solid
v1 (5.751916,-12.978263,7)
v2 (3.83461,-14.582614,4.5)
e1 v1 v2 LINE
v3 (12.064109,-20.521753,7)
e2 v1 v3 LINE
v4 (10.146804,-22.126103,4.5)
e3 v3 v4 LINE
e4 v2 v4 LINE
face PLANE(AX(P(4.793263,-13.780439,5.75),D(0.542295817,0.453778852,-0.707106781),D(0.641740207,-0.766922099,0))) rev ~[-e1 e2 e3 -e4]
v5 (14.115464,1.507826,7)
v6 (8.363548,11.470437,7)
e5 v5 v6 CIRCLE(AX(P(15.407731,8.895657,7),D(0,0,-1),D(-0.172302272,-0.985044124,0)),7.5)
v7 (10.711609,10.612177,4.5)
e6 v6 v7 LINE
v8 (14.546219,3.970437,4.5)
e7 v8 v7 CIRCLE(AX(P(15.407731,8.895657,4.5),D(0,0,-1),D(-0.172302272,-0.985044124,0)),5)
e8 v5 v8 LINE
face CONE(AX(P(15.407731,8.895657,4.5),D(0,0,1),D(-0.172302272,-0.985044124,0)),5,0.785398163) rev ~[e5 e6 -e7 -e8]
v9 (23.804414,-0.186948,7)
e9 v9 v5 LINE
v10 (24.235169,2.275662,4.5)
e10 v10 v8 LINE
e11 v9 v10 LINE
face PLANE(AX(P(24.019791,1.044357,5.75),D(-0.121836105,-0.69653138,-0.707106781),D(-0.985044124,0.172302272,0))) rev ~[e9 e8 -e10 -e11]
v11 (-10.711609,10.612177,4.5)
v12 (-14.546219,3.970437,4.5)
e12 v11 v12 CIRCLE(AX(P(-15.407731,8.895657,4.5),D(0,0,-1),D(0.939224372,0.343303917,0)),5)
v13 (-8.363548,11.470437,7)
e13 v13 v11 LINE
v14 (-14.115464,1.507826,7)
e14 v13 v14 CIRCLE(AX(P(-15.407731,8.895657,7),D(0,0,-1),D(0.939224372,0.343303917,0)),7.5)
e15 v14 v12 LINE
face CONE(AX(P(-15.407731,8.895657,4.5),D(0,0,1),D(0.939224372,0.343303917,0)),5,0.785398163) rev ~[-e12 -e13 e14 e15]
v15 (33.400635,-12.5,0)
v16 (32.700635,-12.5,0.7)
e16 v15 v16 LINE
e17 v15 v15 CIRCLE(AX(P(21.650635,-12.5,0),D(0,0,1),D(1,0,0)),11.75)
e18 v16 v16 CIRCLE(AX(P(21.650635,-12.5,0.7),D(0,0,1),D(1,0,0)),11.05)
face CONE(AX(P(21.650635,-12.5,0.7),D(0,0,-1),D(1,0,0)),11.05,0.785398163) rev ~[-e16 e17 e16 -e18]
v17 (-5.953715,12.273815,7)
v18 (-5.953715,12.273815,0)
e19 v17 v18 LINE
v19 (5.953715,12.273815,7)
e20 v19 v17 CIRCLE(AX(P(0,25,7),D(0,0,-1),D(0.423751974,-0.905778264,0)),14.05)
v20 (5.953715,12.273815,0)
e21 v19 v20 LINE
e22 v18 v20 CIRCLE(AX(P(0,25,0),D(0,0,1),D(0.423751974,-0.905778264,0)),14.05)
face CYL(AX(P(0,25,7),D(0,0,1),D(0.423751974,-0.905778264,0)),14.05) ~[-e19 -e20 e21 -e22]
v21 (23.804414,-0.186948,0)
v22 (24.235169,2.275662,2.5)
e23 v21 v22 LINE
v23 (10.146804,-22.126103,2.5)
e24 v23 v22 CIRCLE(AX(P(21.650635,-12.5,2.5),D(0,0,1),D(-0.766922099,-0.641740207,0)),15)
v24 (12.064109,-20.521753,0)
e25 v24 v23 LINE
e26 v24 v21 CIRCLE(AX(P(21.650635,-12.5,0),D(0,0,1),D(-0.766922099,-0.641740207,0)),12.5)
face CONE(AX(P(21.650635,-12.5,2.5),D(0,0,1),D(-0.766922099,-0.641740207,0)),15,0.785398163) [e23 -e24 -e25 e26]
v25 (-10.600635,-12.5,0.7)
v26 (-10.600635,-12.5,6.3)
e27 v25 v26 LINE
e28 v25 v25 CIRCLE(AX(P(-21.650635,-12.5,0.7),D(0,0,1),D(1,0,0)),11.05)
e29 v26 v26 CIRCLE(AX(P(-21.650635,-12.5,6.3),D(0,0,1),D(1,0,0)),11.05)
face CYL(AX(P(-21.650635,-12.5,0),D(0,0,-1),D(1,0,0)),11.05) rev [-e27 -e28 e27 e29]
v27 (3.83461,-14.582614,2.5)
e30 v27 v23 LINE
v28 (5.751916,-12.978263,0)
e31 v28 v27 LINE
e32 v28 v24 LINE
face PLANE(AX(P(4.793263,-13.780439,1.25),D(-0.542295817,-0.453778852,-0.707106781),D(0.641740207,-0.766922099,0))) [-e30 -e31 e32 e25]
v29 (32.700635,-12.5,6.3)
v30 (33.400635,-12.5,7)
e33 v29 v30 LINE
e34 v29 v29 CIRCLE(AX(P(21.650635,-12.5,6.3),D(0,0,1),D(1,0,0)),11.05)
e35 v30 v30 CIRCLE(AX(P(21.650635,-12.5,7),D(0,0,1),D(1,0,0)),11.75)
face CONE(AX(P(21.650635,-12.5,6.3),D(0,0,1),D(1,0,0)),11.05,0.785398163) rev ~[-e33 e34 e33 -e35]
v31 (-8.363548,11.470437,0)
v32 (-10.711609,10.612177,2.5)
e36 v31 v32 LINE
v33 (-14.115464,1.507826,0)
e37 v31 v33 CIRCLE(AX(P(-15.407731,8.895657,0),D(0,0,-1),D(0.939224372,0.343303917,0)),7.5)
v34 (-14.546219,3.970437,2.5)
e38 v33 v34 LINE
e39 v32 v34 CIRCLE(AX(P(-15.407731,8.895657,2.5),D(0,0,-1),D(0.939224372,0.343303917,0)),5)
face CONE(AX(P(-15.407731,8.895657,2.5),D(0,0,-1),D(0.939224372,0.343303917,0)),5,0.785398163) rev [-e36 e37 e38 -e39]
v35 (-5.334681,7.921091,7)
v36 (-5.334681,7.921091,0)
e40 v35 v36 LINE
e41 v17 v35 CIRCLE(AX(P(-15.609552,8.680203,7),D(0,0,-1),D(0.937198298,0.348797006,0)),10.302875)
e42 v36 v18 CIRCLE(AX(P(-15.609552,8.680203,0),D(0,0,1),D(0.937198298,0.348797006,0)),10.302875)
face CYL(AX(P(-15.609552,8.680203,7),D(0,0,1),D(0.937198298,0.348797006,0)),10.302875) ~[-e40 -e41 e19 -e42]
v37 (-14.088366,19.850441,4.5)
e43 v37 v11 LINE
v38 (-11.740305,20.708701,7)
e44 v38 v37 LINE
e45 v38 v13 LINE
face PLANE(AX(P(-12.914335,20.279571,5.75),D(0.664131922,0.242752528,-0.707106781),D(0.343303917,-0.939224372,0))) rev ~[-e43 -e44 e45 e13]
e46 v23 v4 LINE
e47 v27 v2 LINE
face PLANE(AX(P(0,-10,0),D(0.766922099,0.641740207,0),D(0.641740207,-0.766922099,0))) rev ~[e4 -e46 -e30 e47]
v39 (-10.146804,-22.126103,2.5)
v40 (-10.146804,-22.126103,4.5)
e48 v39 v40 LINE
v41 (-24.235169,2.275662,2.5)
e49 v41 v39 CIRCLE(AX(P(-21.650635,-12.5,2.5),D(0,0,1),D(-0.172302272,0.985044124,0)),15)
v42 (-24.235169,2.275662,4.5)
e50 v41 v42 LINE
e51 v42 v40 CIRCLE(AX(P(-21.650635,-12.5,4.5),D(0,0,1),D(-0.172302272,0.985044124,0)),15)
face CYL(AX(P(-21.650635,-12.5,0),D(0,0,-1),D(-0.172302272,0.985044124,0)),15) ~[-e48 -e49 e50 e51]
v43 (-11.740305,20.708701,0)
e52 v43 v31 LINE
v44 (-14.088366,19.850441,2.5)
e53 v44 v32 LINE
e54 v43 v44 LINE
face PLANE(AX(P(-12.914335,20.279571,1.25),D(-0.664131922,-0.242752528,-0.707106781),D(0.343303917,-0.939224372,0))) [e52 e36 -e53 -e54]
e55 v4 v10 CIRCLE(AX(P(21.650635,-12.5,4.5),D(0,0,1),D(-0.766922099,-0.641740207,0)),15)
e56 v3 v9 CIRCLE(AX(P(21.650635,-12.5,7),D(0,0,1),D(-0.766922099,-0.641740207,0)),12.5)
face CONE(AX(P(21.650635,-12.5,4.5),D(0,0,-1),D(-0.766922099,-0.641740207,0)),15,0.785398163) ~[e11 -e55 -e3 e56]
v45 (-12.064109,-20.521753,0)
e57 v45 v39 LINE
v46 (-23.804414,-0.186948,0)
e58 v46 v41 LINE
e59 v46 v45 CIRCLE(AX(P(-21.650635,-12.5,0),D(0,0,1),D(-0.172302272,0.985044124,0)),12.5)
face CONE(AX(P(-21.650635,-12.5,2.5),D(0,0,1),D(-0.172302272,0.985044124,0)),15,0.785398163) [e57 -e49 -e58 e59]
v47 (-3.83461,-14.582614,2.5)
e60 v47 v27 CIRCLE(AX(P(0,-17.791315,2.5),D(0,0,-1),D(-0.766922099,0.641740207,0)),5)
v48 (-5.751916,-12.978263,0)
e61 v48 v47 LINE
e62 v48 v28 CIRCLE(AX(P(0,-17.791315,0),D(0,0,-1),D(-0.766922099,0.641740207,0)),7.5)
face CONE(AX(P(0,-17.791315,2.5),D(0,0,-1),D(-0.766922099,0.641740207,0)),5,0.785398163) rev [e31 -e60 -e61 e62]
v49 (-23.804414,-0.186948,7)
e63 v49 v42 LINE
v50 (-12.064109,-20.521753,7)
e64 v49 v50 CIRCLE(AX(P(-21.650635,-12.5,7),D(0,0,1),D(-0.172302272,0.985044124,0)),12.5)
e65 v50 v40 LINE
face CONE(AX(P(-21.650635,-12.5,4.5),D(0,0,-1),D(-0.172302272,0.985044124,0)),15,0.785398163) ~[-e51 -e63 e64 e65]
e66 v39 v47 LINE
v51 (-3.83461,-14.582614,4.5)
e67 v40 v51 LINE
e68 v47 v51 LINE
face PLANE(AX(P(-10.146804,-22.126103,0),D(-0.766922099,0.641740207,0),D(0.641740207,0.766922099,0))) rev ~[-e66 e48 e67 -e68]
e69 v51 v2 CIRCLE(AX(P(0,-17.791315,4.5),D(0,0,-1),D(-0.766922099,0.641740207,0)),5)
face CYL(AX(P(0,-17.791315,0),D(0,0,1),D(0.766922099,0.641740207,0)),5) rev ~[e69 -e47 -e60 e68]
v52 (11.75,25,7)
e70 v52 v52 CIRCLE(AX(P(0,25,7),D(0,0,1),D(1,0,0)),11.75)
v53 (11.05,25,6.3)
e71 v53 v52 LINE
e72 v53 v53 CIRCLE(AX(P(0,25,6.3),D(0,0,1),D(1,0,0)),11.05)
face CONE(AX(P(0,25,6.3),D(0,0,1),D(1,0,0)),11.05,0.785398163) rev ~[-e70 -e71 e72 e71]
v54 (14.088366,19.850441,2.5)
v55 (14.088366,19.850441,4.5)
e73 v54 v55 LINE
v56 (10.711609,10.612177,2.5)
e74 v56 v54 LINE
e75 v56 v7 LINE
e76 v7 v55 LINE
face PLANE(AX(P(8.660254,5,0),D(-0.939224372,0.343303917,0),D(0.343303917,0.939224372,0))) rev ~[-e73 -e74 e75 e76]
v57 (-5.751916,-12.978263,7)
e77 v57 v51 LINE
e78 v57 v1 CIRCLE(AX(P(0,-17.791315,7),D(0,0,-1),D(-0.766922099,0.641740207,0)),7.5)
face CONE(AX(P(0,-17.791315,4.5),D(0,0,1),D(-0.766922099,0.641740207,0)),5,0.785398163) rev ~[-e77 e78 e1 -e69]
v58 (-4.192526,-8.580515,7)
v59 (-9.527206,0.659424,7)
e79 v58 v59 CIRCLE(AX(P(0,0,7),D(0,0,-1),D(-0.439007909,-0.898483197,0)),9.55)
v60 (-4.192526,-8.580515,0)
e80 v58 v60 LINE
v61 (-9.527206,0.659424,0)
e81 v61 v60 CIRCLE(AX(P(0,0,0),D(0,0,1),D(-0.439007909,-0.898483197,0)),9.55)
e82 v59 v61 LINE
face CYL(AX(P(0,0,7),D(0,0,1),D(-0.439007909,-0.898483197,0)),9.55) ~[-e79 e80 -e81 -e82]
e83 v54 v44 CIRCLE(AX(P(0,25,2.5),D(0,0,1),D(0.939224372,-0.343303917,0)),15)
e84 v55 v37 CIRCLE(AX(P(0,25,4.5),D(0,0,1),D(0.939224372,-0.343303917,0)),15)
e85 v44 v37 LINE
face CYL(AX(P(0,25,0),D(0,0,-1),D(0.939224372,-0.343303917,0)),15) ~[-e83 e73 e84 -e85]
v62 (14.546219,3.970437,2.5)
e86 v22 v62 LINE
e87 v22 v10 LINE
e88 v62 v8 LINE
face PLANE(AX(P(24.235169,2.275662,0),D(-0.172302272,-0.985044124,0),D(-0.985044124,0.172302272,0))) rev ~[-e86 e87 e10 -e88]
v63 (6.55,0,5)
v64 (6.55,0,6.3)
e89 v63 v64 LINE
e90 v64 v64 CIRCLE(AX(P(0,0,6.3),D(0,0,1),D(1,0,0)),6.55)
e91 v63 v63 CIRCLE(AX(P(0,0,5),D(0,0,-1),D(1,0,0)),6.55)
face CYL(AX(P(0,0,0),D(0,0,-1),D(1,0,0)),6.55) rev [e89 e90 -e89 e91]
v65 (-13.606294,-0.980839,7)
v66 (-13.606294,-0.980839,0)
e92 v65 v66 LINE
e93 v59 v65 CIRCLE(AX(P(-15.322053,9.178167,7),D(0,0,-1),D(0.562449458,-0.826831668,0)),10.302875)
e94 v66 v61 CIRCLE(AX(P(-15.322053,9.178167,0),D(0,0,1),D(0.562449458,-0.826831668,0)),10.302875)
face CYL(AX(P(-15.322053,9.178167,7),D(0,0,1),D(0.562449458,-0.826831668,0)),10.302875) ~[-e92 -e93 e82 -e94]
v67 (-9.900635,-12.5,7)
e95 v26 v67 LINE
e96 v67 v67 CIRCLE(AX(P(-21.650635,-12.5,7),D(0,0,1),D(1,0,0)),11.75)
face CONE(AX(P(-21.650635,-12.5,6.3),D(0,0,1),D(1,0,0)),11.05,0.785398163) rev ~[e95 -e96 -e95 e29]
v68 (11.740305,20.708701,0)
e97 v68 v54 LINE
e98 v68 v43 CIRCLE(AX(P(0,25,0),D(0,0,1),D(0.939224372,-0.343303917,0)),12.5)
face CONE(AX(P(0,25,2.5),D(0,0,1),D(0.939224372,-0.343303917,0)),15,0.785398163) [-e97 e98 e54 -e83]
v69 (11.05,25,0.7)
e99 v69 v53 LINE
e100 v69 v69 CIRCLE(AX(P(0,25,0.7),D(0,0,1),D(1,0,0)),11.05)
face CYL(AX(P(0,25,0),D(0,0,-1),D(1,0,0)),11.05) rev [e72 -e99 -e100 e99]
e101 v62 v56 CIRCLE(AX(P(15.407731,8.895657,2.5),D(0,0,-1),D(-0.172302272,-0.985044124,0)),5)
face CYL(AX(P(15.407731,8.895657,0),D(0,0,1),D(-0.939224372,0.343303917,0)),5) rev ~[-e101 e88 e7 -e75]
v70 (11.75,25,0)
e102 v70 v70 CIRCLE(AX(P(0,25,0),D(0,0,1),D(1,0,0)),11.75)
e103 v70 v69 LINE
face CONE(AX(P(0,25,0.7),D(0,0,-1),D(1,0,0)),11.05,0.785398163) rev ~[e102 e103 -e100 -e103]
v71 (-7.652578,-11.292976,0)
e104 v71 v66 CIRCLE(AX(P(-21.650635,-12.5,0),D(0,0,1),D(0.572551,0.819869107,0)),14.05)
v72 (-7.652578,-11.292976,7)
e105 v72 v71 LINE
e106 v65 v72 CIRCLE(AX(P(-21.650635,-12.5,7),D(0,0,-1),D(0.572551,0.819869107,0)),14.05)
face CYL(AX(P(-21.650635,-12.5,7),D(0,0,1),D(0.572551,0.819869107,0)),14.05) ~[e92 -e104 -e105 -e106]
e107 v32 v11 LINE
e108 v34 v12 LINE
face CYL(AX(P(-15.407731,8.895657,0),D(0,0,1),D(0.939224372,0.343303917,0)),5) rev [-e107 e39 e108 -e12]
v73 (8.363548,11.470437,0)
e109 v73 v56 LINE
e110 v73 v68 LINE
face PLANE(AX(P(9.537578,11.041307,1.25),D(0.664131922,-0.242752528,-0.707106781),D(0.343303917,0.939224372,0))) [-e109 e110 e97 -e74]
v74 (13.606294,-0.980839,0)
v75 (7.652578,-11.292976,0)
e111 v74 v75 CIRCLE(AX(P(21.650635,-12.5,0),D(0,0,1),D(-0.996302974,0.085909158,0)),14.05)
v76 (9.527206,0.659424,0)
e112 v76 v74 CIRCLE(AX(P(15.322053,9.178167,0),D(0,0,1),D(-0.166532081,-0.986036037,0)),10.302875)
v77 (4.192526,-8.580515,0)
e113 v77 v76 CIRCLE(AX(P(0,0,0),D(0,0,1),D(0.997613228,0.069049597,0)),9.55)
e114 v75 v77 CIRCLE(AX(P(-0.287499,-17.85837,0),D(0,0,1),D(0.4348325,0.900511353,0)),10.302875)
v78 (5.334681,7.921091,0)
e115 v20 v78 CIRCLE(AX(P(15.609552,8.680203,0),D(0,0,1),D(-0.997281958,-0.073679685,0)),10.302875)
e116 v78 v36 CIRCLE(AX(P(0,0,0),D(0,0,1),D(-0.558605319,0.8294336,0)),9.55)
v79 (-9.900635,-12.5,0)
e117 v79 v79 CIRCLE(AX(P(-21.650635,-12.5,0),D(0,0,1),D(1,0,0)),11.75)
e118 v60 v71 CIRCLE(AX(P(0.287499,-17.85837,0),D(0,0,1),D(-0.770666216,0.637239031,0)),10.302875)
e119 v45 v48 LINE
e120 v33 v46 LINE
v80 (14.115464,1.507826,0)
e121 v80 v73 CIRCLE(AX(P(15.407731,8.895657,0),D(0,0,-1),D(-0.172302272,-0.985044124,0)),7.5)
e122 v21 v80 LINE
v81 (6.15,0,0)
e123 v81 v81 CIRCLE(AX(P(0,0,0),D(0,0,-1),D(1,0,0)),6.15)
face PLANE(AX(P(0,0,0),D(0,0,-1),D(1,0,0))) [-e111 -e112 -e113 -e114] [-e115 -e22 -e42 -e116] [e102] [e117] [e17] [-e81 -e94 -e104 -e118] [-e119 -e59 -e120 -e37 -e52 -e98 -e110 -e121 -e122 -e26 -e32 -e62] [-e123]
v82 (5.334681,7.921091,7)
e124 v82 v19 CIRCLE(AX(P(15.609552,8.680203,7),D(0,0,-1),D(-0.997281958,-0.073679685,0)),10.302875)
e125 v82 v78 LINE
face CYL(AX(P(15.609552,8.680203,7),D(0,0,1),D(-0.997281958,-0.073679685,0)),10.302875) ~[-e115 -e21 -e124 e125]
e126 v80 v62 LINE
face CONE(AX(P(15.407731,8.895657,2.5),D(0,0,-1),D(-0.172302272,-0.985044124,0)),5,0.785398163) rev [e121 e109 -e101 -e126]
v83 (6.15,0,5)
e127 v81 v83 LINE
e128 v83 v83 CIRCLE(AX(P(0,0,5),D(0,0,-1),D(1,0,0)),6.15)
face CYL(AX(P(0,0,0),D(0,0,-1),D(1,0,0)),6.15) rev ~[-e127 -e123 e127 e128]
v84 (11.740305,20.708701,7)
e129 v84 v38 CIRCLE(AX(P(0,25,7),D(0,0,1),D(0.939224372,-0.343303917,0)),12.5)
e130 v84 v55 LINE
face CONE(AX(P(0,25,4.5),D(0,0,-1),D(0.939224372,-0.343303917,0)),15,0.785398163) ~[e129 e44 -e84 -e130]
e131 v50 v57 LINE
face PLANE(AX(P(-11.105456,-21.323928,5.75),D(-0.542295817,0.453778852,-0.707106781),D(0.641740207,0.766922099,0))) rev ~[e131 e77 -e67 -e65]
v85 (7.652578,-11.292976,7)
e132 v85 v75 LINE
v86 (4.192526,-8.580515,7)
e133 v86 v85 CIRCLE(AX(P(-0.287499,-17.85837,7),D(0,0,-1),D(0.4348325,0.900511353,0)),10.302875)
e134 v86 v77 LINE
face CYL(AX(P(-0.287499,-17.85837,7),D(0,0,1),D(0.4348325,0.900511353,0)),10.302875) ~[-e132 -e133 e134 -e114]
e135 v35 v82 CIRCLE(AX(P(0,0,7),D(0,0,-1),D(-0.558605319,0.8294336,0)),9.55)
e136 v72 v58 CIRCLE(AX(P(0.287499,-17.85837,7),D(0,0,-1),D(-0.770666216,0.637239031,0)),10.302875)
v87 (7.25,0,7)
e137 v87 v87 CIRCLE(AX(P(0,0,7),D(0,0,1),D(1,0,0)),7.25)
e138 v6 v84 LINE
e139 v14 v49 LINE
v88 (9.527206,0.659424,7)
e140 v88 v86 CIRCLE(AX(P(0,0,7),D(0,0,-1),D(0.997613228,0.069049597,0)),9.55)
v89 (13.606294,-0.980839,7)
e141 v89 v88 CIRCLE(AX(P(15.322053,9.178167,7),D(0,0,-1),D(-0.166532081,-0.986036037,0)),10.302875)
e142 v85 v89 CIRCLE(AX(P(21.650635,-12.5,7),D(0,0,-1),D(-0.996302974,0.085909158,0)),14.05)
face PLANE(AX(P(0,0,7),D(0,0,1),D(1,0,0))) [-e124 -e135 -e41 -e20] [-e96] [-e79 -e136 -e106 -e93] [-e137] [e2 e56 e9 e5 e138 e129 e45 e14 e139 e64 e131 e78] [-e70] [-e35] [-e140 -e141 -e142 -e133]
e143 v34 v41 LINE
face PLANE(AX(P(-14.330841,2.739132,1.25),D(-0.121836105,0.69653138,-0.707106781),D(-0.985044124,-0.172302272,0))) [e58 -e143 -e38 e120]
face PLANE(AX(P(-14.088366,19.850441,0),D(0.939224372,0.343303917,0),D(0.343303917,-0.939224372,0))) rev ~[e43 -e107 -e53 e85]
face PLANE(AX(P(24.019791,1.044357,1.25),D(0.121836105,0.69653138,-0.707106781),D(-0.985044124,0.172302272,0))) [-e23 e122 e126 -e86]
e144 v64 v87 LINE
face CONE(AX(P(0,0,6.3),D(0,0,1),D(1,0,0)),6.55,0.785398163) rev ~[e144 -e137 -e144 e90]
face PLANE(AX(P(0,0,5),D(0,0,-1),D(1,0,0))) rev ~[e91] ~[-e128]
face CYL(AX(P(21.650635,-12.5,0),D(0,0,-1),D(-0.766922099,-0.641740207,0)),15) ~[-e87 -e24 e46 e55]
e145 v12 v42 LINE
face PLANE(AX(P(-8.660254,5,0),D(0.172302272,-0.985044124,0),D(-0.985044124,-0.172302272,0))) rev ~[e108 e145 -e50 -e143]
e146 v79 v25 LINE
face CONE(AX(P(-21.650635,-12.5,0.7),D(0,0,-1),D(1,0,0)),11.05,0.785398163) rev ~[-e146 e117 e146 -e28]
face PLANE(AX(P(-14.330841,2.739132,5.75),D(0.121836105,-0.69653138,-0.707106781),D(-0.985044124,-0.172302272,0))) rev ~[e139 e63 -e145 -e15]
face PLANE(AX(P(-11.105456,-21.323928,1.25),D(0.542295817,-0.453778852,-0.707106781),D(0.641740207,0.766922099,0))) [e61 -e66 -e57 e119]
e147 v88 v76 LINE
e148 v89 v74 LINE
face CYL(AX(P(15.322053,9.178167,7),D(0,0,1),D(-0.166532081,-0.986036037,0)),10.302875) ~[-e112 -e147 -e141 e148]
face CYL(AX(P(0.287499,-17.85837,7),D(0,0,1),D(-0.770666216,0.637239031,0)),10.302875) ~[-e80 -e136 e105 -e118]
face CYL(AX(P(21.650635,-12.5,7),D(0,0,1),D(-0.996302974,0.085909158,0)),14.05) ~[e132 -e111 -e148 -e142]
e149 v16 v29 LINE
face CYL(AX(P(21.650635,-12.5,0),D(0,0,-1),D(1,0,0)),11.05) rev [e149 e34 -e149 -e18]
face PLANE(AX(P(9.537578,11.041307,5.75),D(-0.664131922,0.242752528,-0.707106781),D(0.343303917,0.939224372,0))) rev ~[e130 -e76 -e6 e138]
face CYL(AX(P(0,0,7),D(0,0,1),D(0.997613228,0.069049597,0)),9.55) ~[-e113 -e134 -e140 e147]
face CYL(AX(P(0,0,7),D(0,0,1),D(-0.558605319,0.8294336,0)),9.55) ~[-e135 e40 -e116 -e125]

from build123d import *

# Parameters (mm, degrees)
F0_R     = 11.05
F0_R_2   = 6.55
F1_DEPTH = 7
F2_R     = 5
F3_SIZE  = 2.5
F4_R     = 6.55
F4_R_2   = 6.15
F5_DEPTH = 5
F6_SIZE  = 0.7
F8_DEPTH = 25


with BuildPart() as f1:
    # F0 (on Top) → F1 (new body)
    with BuildSketch(Plane.XY):
        with BuildLine():
            Line((8.6602540378, 5), (14.0883655764, 19.8504412435))
            ThreePointArc((14.0883655764, 19.8504412435), (0, 40), (-14.0883655764, 19.8504412435))
            Line((-14.0883655764, 19.8504412435), (-8.6602540378, 5))
            Line((-8.6602540378, 5), (-24.2351691813, 2.2756618652))
            ThreePointArc((-24.2351691813, 2.2756618652), (-34.6410161514, -20), (-10.146803605, -22.1261031087))
            Line((-10.146803605, -22.1261031087), (0, -10))
            Line((0, -10), (10.146803605, -22.1261031087))
            ThreePointArc((10.146803605, -22.1261031087), (34.6410161514, -20), (24.2351691813, 2.2756618652))
            Line((24.2351691813, 2.2756618652), (8.6602540378, 5))
        make_face()
        with Locations((-21.6506350946, -12.5)):
            Circle(F0_R, mode=Mode.SUBTRACT)
        with Locations((21.6506350946, -12.5)):
            Circle(F0_R, mode=Mode.SUBTRACT)
        Circle(F0_R_2, mode=Mode.SUBTRACT)
        with Locations((0, 25)):
            Circle(F0_R, mode=Mode.SUBTRACT)
    extrude(amount=F1_DEPTH)

    # F2
    f2_edges = [f1.edges().sort_by_distance(p)[0] for p in [
        (0, -10, 3.5),
        (8.660254, 5, 3.5),
        (-8.660254, 5, 3.5),
    ]]
    fillet(f2_edges, radius=F2_R)

    # F3
    f3_edges = [f1.edges().sort_by_distance(p)[0] for p in [
        (-19.390694, 3.123049, 7),
        (-6.990707, -18.354358, 0),
        (12.399987, 15.231309, 0),
        (12.399987, 15.231309, 7),
        (11.077604, 6.395657, 0),
        (0, 40, 0),
        (19.390694, 3.123049, 0),
        (-12.399987, 15.231309, 0),
        (34.641016, -20, 0),
        (-11.077604, 6.395657, 0),
        (6.990707, -18.354358, 0),
        (-19.390694, 3.123049, 0),
        (0, -12.791315, 0),
        (-34.641016, -20, 0),
        (11.077604, 6.395657, 7),
        (0, 40, 7),
        (19.390694, 3.123049, 7),
        (-12.399987, 15.231309, 7),
        (34.641016, -20, 7),
        (-11.077604, 6.395657, 7),
        (6.990707, -18.354358, 7),
        (0, -12.791315, 7),
        (-34.641016, -20, 7),
        (-6.990707, -18.354358, 7),
    ]]
    chamfer(f3_edges, length=F3_SIZE)

    # F4 (on face) → F5 (join)
    with BuildSketch(Plane(origin=(0, 0, 0), x_dir=(1, 0, 0), z_dir=(0, 0, -1))):
        Circle(F4_R)
        Circle(F4_R_2, mode=Mode.SUBTRACT)
    extrude(amount=-F5_DEPTH)

    # F6
    f6_edges = [f1.edges().sort_by_distance(p)[0] for p in [
        (-6.55, 0, 7),
        (-32.700635, -12.5, 7),
        (10.600635, -12.5, 7),
        (-11.05, 25, 7),
        (-32.700635, -12.5, 0),
        (10.600635, -12.5, 0),
        (-11.05, 25, 0),
    ]]
    chamfer(f6_edges, length=F6_SIZE)

    # F7 (on face) → F8 (cut)
    with BuildSketch(Plane.XY.offset(7)):
        with BuildLine():
            ThreePointArc((-4.1925255318, -8.5805145338), (-8.2705426061, -4.775), (-9.5272063297, 0.6594236504))
            ThreePointArc((-9.5272063297, 0.6594236504), (-11.4782376336, -0.3808245165), (-13.6062935442, -0.9808390488))
            ThreePointArc((-13.6062935442, -0.9808390488), (-9.4829781714, -5.475), (-7.6525783054, -11.2929763362))
            ThreePointArc((-7.6525783054, -11.2929763362), (-6.0689225225, -9.7500331232), (-4.1925255318, -8.5805145338))
        make_face()
        with BuildLine():
            ThreePointArc((-5.3346807979, 7.9210908835), (0, 9.55), (5.3346807979, 7.9210908835))
            ThreePointArc((5.3346807979, 7.9210908835), (5.4093151112, 10.1308576396), (5.9537152388, 12.273815385))
            ThreePointArc((5.9537152388, 12.273815385), (0, 10.95), (-5.9537152388, 12.273815385))
            ThreePointArc((-5.9537152388, 12.273815385), (-5.4093151112, 10.1308576396), (-5.3346807979, 7.9210908835))
        make_face()
        with BuildLine():
            ThreePointArc((9.5272063297, 0.6594236504), (8.2705426061, -4.775), (4.1925255318, -8.5805145338))
            ThreePointArc((4.1925255318, -8.5805145338), (6.0689225225, -9.7500331232), (7.6525783054, -11.2929763362))
            ThreePointArc((7.6525783054, -11.2929763362), (9.4829781714, -5.475), (13.6062935442, -0.9808390488))
            ThreePointArc((13.6062935442, -0.9808390488), (11.4782376336, -0.3808245165), (9.5272063297, 0.6594236504))
        make_face()
    extrude(amount=-F8_DEPTH, mode=Mode.SUBTRACT)


solid = f1.part
